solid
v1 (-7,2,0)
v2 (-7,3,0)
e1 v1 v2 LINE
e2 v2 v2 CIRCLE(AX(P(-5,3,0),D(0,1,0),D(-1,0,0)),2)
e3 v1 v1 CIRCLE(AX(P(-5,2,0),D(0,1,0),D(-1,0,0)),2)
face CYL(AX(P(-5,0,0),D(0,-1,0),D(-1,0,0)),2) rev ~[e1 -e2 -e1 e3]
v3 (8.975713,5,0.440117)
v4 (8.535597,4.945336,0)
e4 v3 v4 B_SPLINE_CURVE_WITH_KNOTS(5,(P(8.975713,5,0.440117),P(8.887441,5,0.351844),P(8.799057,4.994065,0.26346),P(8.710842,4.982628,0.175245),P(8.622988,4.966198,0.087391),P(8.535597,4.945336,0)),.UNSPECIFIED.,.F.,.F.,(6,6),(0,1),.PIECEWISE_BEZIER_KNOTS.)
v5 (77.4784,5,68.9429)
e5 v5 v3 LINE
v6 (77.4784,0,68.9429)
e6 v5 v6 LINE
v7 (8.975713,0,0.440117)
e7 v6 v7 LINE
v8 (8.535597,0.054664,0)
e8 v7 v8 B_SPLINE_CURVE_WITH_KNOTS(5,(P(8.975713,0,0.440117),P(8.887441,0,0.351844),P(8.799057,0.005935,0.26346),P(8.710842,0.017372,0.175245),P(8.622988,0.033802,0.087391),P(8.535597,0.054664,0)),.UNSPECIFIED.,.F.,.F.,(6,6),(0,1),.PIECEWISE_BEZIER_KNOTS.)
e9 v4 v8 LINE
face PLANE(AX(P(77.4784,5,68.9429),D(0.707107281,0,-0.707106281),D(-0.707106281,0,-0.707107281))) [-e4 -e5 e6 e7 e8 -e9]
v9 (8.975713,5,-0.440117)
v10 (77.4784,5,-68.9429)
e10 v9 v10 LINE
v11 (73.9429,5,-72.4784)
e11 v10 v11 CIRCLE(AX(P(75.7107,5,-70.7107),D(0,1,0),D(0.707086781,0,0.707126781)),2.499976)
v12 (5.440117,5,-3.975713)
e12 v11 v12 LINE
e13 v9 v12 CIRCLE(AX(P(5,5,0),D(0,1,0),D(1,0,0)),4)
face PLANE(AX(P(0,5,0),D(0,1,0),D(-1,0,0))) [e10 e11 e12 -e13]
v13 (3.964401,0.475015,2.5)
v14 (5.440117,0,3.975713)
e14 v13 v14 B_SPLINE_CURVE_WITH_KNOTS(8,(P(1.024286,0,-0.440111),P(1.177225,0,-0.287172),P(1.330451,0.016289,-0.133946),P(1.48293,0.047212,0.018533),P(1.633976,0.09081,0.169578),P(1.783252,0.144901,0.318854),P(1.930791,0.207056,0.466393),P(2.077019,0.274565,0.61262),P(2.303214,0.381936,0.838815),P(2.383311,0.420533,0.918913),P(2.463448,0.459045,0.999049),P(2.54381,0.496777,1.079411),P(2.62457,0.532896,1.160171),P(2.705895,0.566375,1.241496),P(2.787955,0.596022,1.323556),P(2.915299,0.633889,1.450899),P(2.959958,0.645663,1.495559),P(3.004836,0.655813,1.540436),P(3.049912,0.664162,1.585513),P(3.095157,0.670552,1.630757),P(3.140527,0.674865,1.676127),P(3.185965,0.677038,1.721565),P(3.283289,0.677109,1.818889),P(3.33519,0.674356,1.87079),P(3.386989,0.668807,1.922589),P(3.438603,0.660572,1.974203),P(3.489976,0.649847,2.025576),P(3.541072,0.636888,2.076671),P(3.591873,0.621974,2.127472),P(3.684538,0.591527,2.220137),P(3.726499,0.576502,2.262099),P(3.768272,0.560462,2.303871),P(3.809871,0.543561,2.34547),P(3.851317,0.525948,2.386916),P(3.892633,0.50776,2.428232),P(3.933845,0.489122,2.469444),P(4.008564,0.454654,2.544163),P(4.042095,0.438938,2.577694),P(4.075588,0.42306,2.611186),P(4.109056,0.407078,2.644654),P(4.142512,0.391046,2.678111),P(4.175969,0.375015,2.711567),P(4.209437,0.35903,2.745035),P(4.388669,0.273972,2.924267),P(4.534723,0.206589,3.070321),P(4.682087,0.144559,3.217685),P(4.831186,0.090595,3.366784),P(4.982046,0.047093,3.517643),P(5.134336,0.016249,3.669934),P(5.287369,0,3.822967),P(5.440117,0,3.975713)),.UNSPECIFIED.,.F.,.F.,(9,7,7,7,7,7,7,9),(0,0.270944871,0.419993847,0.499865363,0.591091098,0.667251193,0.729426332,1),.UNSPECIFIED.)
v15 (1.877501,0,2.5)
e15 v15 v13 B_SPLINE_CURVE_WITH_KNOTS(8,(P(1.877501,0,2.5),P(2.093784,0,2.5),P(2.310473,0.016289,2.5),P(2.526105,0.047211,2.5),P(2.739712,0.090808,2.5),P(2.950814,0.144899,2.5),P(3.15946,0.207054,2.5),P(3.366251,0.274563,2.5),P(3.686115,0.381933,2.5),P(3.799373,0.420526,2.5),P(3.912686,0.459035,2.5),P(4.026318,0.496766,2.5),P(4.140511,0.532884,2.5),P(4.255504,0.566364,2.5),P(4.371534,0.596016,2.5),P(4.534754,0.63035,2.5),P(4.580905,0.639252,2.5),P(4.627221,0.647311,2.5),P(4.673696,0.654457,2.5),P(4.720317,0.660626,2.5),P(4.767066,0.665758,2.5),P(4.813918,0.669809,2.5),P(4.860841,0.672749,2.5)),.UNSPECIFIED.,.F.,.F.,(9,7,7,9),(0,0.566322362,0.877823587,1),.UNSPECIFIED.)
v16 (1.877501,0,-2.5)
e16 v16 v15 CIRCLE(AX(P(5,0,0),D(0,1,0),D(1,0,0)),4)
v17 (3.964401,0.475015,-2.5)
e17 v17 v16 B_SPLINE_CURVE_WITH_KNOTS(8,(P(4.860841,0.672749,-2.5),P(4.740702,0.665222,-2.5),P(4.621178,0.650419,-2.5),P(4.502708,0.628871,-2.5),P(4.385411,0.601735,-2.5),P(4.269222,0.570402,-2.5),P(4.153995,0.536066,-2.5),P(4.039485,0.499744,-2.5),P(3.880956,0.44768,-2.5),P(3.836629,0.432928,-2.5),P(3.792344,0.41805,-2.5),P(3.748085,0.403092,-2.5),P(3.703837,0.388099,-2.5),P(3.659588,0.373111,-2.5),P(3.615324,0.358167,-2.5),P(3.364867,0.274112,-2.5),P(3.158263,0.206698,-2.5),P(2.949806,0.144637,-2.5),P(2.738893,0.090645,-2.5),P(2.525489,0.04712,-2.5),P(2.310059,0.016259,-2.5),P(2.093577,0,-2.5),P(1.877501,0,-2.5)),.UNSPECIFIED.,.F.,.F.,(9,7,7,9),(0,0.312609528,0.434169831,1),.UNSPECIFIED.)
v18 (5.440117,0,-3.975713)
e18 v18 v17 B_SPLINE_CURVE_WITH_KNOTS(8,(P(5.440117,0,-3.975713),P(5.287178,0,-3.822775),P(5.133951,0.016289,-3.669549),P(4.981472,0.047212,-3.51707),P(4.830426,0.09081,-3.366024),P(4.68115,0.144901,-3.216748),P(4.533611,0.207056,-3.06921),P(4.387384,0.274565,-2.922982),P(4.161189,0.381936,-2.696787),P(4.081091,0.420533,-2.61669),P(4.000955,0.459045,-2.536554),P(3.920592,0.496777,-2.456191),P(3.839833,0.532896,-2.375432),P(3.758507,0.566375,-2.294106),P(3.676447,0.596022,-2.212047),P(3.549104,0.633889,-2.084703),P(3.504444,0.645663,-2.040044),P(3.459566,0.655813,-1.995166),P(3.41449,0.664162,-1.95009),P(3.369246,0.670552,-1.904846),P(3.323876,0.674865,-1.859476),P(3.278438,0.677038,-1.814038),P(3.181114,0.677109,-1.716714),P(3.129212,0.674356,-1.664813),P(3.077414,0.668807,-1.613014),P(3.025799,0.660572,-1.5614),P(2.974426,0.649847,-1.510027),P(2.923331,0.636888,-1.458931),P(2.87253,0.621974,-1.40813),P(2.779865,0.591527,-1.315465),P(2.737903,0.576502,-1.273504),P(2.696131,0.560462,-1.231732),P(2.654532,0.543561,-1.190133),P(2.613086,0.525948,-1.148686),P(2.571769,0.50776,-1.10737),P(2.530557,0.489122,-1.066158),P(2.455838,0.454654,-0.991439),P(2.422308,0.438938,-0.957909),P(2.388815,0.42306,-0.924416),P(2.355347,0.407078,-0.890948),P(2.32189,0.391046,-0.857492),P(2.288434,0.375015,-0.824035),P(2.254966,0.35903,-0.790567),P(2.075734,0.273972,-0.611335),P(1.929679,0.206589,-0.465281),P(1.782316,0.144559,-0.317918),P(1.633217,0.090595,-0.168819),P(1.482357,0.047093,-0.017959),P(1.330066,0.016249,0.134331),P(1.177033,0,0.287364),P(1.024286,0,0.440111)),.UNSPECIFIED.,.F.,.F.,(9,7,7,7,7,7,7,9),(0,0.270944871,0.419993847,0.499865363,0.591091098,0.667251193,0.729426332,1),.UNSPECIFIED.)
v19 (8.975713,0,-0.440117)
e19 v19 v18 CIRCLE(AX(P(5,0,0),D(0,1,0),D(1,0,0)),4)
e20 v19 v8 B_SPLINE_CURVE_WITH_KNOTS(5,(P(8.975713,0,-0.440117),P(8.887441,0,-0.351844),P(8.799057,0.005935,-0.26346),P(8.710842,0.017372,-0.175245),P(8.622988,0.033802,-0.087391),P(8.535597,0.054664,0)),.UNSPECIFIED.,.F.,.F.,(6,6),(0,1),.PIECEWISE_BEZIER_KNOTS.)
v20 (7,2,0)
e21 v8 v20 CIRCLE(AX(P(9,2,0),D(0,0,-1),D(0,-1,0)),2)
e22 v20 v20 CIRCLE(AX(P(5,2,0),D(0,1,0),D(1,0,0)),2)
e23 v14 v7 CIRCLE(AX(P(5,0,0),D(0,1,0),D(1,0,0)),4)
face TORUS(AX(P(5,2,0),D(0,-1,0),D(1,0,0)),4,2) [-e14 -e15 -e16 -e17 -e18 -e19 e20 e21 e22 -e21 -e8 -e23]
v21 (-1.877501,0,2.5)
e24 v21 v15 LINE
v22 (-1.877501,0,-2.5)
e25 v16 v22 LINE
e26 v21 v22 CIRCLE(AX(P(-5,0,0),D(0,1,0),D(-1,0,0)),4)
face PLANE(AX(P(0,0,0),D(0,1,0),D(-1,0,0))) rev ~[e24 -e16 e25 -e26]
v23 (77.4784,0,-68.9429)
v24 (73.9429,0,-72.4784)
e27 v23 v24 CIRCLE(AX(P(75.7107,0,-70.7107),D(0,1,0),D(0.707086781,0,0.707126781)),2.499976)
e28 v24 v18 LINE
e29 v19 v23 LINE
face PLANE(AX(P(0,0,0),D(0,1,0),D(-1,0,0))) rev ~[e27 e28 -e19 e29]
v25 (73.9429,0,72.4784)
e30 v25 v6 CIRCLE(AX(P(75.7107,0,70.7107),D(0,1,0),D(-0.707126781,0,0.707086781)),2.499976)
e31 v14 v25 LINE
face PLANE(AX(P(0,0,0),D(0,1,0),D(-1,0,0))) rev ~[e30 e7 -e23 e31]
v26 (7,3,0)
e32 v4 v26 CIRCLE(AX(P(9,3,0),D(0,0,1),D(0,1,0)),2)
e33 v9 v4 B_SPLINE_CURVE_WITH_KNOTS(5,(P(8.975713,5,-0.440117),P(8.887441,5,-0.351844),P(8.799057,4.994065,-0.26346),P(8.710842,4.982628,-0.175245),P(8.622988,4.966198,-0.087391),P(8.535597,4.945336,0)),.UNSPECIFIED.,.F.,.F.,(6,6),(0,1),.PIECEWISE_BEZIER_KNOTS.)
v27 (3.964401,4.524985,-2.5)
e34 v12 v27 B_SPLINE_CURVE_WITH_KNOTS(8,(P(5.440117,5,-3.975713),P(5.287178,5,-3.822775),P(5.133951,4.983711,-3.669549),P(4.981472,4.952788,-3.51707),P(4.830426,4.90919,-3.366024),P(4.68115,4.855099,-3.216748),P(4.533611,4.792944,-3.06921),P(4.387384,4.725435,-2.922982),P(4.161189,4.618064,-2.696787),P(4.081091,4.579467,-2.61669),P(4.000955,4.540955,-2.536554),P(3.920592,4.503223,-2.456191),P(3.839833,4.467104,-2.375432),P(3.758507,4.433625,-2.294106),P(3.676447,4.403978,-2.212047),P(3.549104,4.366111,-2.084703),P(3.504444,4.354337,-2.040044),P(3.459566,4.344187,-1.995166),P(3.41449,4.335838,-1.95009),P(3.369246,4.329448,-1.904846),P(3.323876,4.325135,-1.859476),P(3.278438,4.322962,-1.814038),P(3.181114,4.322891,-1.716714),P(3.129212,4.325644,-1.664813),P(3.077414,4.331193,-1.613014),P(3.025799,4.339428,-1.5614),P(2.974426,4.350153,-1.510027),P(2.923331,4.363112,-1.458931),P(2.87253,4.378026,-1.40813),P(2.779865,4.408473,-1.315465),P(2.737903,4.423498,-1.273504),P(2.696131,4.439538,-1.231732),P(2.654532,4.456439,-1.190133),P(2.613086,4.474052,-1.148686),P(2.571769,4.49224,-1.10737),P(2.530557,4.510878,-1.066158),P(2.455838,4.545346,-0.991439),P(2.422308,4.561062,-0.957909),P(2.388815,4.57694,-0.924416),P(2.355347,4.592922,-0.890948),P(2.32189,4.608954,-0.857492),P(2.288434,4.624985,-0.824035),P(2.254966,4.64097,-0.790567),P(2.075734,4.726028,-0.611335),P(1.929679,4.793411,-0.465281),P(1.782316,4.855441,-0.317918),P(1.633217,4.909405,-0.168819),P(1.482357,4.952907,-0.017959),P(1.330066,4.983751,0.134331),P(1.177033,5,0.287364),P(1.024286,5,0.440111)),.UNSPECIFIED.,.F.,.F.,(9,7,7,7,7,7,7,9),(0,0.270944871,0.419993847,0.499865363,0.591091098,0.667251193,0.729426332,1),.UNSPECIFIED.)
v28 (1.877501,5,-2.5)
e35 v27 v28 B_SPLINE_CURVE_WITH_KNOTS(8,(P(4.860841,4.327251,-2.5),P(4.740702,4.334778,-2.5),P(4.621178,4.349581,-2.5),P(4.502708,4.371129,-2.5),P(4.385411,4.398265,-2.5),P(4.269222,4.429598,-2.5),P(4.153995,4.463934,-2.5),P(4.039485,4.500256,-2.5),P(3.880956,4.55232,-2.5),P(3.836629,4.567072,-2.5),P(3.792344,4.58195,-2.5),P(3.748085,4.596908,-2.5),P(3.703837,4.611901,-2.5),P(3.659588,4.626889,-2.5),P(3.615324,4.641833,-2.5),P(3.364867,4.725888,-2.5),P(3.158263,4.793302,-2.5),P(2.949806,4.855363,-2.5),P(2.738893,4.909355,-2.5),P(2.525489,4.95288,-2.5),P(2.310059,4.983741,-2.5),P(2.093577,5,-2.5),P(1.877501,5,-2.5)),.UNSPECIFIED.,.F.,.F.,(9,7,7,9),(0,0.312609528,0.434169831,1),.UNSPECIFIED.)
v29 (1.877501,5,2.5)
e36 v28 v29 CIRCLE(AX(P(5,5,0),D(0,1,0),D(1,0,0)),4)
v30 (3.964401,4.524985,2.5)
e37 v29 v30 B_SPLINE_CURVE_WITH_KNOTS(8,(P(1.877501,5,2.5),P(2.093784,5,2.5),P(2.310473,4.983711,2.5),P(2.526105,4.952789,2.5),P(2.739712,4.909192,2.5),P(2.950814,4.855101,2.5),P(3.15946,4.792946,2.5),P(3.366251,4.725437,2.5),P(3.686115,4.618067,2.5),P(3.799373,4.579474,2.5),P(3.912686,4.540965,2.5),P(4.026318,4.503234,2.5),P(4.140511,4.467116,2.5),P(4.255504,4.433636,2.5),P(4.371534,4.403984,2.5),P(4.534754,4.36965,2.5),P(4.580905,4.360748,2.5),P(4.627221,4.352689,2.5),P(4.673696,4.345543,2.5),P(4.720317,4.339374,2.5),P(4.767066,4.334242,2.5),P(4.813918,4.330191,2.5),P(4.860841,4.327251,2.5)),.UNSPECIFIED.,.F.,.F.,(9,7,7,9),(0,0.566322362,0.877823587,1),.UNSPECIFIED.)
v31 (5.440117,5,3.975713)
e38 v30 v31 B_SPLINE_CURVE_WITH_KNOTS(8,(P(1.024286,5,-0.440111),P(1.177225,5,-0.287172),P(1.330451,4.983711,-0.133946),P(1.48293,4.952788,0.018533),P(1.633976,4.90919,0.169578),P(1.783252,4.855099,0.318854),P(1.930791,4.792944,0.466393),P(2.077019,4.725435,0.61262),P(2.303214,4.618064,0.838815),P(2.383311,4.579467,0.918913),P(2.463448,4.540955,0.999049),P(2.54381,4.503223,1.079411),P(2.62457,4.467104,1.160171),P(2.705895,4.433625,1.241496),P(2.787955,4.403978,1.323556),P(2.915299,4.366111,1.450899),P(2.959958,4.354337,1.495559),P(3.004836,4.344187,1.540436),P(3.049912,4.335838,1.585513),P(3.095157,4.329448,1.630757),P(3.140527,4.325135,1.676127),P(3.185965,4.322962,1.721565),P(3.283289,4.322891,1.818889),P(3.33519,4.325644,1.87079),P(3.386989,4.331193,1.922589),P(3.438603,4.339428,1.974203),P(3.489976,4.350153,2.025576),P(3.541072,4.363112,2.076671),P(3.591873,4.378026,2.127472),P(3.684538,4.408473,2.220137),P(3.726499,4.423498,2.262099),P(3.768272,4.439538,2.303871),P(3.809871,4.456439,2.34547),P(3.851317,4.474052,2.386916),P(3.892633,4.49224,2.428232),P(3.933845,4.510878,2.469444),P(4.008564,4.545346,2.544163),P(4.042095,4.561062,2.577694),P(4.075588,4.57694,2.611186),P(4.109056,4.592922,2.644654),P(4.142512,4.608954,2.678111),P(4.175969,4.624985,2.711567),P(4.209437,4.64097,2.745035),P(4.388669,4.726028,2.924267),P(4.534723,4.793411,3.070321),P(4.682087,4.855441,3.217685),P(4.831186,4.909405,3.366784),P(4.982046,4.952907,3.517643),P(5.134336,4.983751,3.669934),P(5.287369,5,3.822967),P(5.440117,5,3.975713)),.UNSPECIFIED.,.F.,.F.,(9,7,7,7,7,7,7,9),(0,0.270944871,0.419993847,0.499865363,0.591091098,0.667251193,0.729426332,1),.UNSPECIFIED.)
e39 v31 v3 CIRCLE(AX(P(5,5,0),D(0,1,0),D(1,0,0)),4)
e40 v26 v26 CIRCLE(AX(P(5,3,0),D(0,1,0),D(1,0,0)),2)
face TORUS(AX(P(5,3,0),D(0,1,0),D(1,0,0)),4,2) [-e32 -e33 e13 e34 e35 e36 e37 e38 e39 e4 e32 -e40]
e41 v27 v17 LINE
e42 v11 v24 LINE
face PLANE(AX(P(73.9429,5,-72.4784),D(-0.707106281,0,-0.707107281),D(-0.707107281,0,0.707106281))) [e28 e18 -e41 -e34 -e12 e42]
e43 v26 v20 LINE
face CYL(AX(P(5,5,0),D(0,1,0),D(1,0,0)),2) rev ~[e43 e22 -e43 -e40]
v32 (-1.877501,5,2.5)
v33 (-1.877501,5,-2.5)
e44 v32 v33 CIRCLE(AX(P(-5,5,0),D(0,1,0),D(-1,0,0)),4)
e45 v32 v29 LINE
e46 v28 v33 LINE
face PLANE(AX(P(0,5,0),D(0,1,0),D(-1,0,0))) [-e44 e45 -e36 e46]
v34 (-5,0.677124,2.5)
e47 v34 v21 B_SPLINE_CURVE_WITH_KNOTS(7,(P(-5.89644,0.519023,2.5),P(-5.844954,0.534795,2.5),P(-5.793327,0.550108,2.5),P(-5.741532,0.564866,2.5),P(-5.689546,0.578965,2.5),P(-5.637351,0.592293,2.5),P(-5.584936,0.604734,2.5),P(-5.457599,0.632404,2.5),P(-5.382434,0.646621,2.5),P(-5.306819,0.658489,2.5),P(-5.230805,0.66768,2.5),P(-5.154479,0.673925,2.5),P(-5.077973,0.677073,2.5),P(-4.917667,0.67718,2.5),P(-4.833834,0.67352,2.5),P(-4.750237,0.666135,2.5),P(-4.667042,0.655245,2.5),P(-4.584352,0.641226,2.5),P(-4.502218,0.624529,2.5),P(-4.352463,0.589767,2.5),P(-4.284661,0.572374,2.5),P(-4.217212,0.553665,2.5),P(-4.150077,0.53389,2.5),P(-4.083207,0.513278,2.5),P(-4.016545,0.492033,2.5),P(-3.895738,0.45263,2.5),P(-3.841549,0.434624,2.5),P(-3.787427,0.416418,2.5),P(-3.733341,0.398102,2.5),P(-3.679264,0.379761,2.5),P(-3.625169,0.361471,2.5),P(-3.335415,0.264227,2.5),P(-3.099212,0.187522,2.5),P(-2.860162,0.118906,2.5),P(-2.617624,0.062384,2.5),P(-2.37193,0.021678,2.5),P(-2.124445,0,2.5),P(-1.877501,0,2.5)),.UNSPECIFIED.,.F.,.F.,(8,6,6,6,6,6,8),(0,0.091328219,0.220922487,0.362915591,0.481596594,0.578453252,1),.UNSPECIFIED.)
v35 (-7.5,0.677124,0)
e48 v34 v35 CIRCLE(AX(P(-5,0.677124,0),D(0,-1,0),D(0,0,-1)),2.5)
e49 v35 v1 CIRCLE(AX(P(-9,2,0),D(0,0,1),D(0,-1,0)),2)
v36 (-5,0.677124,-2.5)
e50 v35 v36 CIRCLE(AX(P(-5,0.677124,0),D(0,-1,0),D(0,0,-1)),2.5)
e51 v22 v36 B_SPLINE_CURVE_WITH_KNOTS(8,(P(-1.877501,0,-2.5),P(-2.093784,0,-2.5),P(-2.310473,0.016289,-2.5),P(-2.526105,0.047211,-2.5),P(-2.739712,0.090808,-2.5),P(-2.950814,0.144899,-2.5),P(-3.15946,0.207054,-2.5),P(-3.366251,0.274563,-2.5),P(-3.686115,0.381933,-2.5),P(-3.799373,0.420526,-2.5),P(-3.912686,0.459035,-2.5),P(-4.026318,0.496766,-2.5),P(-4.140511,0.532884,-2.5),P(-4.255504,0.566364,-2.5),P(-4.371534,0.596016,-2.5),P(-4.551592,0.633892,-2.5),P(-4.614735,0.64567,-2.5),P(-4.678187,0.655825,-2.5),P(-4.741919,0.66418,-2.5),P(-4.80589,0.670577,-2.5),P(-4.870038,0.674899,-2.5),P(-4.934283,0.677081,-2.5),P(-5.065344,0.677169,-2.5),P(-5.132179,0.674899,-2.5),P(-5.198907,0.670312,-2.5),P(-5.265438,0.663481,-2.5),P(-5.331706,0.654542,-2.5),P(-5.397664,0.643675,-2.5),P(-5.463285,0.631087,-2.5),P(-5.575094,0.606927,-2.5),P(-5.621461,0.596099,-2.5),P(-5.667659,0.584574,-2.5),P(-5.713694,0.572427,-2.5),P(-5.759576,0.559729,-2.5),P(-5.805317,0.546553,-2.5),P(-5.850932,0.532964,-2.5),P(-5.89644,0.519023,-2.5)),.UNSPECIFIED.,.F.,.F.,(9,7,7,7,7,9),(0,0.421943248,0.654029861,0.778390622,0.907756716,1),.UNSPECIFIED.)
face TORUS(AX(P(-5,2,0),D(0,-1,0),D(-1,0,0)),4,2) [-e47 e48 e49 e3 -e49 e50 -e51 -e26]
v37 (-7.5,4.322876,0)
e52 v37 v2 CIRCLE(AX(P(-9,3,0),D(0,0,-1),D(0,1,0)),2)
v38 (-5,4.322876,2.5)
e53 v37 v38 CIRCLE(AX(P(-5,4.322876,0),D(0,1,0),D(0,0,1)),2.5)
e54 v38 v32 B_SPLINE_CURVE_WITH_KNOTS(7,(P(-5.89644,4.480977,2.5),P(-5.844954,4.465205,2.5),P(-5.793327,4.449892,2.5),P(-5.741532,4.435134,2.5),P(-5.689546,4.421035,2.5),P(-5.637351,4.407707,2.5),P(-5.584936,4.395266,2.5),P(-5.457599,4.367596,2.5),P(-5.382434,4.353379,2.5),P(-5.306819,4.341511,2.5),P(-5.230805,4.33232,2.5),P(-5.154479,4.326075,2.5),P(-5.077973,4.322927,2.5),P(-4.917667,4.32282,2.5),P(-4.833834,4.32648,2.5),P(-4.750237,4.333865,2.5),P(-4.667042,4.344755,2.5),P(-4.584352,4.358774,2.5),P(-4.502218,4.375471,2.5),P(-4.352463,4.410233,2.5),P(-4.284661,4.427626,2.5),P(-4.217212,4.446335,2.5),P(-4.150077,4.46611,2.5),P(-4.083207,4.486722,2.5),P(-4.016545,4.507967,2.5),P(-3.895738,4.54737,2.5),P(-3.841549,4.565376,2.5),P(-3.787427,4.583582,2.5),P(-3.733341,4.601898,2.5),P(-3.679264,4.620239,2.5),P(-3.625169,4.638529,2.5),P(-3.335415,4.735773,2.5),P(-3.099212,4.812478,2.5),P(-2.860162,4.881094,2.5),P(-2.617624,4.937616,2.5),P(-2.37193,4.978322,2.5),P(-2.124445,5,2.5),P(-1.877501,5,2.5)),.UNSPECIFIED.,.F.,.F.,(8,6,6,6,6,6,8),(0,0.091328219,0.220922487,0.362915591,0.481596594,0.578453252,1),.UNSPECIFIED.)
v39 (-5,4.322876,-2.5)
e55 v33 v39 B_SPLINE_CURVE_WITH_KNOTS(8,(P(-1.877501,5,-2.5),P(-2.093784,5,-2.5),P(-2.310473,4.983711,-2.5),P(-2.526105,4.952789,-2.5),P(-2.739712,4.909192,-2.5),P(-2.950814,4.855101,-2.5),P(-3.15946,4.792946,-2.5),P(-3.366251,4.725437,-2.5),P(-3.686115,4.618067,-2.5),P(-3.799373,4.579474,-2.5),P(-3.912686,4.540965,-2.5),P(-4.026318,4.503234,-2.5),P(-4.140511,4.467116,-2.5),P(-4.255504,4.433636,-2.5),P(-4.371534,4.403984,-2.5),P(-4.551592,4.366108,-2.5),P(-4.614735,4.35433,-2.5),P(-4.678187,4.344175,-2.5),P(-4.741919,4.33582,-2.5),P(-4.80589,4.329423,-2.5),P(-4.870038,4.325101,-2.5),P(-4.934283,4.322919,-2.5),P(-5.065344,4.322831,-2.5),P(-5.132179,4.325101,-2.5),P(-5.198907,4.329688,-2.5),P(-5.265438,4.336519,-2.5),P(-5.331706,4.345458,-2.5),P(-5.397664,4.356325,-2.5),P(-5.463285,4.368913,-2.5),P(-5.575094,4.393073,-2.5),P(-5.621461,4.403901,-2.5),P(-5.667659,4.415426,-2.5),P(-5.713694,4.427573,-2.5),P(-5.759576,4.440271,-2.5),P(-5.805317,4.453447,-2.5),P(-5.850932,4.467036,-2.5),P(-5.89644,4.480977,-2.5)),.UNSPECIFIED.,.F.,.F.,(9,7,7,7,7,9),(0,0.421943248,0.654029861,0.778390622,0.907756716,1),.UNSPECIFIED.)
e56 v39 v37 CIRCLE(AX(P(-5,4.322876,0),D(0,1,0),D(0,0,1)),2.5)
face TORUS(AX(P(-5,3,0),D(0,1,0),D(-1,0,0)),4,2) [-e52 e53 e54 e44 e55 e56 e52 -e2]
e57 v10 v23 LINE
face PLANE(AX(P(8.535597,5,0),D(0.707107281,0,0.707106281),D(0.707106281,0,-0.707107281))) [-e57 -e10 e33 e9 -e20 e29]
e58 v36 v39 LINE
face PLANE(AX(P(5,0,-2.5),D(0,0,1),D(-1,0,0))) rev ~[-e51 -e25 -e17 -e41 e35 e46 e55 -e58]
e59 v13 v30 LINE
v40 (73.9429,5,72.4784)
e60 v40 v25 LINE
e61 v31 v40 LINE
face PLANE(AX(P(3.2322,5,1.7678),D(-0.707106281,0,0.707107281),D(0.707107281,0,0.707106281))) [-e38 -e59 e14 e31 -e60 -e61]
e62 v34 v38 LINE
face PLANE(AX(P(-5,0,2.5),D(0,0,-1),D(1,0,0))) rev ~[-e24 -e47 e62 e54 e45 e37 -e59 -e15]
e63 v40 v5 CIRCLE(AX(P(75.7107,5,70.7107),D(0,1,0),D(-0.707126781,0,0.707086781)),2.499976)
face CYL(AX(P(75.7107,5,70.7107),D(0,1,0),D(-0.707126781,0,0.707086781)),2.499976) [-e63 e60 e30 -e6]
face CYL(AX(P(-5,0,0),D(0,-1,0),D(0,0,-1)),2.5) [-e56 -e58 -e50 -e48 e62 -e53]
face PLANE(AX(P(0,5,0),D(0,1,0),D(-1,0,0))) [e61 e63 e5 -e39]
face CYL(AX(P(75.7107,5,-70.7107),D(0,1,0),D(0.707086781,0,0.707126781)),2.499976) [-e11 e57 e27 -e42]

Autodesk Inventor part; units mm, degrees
ref_plane "YZ Plane" through (0, 0, 0) normal (1, 0, 0) x (0, 1, 0)
ref_plane "XZ Plane" through (0, 0, 0) normal (0, 1, 0) x (-1, 0, 0)
ref_plane "XY Plane" through (0, 0, 0) normal (0, 0, 1) x (1, 0, 0)
sketch "草图2" plane through (0, 0, 0) normal (0, 1, 0) x (-1, 0, 0)
  line L0 (5, 0) -> (-5, 0) construction
  line L1 (5, 2.5) -> (-5, 2.5)
  line L2 (-5, -2.5) -> (5, -2.5)
  arc A0 (5, -2.5) -> (5, 2.5) centre (5, 0) ccw
  arc A1 (-5, 2.5) -> (-5, -2.5) centre (-5, 0) ccw
  line L3 (5, 0) -> (15, 0) construction
  circle A2 centre (5, 0) radius 2
  circle A3 centre (-5, 0) radius 2
  point P0 (0, 0)
  point P1 (0, 0)
  dimension "d6" = 10
  dimension "d7" = 180
  dimension "d8" = 5
  dimension "d9" = 4
  dimension "d10" = 4
extrude "拉伸1" add sketch "草图2" along normal blind 5
sketch "草图3" plane through (0, 5, 0) normal (0, 1, 0) x (1, 0, 0)
  line L0 (5, 0) -> (75.7107, 70.7107) construction
  line L1 (6.7678, -1.7678) -> (77.4784, 68.9429)
  line L2 (73.9429, 72.4784) -> (3.2322, 1.7678)
  arc A0 (3.2322, 1.7678) -> (6.7678, -1.7678) centre (5, 0) ccw
  arc A1 (77.4784, 68.9429) -> (73.9429, 72.4784) centre (75.7107, 70.7107) ccw
  line L3 (5, 0) -> (105, 0) construction
  line L4 (5, 0) -> (75.7107, -70.7107) construction
  line L5 (3.2322, -1.7678) -> (73.9429, -72.4784)
  line L6 (77.4784, -68.9429) -> (6.7678, 1.7678)
  arc A2 (6.7678, 1.7678) -> (3.2322, -1.7678) centre (5, 0) ccw
  arc A3 (73.9429, -72.4784) -> (77.4784, -68.9429) centre (75.7107, -70.7107) ccw
  line L7 (5, 0) -> (105, 0) construction
  point P0 (0, 0)
  point P1 (40.3553, 35.3553)
  point P2 (40.3553, -35.3553)
  dimension "d13" = 100
  dimension "d14" = 45
  dimension "d15" = 5
  dimension "d16" = 100
  dimension "d17" = 45
  dimension "d18" = 5
extrude "拉伸2" add sketch "草图3" against normal blind 5
sketch "草图4" plane through (0, 5, 0) normal (0, 1, 0) x (1, 0, 0)
  circle A0 centre (5, 0) radius 2
  point P0 (0, 0)
  dimension "d21" = 4
extrude "拉伸3" cut sketch "草图4" against normal through all
fillet "圆角1" radius 2 4 edges at (3, 0, 0) (3, 5, 0) (-3, 5, 0) (-3, 0, 0)
properties part number "压缩杆"
